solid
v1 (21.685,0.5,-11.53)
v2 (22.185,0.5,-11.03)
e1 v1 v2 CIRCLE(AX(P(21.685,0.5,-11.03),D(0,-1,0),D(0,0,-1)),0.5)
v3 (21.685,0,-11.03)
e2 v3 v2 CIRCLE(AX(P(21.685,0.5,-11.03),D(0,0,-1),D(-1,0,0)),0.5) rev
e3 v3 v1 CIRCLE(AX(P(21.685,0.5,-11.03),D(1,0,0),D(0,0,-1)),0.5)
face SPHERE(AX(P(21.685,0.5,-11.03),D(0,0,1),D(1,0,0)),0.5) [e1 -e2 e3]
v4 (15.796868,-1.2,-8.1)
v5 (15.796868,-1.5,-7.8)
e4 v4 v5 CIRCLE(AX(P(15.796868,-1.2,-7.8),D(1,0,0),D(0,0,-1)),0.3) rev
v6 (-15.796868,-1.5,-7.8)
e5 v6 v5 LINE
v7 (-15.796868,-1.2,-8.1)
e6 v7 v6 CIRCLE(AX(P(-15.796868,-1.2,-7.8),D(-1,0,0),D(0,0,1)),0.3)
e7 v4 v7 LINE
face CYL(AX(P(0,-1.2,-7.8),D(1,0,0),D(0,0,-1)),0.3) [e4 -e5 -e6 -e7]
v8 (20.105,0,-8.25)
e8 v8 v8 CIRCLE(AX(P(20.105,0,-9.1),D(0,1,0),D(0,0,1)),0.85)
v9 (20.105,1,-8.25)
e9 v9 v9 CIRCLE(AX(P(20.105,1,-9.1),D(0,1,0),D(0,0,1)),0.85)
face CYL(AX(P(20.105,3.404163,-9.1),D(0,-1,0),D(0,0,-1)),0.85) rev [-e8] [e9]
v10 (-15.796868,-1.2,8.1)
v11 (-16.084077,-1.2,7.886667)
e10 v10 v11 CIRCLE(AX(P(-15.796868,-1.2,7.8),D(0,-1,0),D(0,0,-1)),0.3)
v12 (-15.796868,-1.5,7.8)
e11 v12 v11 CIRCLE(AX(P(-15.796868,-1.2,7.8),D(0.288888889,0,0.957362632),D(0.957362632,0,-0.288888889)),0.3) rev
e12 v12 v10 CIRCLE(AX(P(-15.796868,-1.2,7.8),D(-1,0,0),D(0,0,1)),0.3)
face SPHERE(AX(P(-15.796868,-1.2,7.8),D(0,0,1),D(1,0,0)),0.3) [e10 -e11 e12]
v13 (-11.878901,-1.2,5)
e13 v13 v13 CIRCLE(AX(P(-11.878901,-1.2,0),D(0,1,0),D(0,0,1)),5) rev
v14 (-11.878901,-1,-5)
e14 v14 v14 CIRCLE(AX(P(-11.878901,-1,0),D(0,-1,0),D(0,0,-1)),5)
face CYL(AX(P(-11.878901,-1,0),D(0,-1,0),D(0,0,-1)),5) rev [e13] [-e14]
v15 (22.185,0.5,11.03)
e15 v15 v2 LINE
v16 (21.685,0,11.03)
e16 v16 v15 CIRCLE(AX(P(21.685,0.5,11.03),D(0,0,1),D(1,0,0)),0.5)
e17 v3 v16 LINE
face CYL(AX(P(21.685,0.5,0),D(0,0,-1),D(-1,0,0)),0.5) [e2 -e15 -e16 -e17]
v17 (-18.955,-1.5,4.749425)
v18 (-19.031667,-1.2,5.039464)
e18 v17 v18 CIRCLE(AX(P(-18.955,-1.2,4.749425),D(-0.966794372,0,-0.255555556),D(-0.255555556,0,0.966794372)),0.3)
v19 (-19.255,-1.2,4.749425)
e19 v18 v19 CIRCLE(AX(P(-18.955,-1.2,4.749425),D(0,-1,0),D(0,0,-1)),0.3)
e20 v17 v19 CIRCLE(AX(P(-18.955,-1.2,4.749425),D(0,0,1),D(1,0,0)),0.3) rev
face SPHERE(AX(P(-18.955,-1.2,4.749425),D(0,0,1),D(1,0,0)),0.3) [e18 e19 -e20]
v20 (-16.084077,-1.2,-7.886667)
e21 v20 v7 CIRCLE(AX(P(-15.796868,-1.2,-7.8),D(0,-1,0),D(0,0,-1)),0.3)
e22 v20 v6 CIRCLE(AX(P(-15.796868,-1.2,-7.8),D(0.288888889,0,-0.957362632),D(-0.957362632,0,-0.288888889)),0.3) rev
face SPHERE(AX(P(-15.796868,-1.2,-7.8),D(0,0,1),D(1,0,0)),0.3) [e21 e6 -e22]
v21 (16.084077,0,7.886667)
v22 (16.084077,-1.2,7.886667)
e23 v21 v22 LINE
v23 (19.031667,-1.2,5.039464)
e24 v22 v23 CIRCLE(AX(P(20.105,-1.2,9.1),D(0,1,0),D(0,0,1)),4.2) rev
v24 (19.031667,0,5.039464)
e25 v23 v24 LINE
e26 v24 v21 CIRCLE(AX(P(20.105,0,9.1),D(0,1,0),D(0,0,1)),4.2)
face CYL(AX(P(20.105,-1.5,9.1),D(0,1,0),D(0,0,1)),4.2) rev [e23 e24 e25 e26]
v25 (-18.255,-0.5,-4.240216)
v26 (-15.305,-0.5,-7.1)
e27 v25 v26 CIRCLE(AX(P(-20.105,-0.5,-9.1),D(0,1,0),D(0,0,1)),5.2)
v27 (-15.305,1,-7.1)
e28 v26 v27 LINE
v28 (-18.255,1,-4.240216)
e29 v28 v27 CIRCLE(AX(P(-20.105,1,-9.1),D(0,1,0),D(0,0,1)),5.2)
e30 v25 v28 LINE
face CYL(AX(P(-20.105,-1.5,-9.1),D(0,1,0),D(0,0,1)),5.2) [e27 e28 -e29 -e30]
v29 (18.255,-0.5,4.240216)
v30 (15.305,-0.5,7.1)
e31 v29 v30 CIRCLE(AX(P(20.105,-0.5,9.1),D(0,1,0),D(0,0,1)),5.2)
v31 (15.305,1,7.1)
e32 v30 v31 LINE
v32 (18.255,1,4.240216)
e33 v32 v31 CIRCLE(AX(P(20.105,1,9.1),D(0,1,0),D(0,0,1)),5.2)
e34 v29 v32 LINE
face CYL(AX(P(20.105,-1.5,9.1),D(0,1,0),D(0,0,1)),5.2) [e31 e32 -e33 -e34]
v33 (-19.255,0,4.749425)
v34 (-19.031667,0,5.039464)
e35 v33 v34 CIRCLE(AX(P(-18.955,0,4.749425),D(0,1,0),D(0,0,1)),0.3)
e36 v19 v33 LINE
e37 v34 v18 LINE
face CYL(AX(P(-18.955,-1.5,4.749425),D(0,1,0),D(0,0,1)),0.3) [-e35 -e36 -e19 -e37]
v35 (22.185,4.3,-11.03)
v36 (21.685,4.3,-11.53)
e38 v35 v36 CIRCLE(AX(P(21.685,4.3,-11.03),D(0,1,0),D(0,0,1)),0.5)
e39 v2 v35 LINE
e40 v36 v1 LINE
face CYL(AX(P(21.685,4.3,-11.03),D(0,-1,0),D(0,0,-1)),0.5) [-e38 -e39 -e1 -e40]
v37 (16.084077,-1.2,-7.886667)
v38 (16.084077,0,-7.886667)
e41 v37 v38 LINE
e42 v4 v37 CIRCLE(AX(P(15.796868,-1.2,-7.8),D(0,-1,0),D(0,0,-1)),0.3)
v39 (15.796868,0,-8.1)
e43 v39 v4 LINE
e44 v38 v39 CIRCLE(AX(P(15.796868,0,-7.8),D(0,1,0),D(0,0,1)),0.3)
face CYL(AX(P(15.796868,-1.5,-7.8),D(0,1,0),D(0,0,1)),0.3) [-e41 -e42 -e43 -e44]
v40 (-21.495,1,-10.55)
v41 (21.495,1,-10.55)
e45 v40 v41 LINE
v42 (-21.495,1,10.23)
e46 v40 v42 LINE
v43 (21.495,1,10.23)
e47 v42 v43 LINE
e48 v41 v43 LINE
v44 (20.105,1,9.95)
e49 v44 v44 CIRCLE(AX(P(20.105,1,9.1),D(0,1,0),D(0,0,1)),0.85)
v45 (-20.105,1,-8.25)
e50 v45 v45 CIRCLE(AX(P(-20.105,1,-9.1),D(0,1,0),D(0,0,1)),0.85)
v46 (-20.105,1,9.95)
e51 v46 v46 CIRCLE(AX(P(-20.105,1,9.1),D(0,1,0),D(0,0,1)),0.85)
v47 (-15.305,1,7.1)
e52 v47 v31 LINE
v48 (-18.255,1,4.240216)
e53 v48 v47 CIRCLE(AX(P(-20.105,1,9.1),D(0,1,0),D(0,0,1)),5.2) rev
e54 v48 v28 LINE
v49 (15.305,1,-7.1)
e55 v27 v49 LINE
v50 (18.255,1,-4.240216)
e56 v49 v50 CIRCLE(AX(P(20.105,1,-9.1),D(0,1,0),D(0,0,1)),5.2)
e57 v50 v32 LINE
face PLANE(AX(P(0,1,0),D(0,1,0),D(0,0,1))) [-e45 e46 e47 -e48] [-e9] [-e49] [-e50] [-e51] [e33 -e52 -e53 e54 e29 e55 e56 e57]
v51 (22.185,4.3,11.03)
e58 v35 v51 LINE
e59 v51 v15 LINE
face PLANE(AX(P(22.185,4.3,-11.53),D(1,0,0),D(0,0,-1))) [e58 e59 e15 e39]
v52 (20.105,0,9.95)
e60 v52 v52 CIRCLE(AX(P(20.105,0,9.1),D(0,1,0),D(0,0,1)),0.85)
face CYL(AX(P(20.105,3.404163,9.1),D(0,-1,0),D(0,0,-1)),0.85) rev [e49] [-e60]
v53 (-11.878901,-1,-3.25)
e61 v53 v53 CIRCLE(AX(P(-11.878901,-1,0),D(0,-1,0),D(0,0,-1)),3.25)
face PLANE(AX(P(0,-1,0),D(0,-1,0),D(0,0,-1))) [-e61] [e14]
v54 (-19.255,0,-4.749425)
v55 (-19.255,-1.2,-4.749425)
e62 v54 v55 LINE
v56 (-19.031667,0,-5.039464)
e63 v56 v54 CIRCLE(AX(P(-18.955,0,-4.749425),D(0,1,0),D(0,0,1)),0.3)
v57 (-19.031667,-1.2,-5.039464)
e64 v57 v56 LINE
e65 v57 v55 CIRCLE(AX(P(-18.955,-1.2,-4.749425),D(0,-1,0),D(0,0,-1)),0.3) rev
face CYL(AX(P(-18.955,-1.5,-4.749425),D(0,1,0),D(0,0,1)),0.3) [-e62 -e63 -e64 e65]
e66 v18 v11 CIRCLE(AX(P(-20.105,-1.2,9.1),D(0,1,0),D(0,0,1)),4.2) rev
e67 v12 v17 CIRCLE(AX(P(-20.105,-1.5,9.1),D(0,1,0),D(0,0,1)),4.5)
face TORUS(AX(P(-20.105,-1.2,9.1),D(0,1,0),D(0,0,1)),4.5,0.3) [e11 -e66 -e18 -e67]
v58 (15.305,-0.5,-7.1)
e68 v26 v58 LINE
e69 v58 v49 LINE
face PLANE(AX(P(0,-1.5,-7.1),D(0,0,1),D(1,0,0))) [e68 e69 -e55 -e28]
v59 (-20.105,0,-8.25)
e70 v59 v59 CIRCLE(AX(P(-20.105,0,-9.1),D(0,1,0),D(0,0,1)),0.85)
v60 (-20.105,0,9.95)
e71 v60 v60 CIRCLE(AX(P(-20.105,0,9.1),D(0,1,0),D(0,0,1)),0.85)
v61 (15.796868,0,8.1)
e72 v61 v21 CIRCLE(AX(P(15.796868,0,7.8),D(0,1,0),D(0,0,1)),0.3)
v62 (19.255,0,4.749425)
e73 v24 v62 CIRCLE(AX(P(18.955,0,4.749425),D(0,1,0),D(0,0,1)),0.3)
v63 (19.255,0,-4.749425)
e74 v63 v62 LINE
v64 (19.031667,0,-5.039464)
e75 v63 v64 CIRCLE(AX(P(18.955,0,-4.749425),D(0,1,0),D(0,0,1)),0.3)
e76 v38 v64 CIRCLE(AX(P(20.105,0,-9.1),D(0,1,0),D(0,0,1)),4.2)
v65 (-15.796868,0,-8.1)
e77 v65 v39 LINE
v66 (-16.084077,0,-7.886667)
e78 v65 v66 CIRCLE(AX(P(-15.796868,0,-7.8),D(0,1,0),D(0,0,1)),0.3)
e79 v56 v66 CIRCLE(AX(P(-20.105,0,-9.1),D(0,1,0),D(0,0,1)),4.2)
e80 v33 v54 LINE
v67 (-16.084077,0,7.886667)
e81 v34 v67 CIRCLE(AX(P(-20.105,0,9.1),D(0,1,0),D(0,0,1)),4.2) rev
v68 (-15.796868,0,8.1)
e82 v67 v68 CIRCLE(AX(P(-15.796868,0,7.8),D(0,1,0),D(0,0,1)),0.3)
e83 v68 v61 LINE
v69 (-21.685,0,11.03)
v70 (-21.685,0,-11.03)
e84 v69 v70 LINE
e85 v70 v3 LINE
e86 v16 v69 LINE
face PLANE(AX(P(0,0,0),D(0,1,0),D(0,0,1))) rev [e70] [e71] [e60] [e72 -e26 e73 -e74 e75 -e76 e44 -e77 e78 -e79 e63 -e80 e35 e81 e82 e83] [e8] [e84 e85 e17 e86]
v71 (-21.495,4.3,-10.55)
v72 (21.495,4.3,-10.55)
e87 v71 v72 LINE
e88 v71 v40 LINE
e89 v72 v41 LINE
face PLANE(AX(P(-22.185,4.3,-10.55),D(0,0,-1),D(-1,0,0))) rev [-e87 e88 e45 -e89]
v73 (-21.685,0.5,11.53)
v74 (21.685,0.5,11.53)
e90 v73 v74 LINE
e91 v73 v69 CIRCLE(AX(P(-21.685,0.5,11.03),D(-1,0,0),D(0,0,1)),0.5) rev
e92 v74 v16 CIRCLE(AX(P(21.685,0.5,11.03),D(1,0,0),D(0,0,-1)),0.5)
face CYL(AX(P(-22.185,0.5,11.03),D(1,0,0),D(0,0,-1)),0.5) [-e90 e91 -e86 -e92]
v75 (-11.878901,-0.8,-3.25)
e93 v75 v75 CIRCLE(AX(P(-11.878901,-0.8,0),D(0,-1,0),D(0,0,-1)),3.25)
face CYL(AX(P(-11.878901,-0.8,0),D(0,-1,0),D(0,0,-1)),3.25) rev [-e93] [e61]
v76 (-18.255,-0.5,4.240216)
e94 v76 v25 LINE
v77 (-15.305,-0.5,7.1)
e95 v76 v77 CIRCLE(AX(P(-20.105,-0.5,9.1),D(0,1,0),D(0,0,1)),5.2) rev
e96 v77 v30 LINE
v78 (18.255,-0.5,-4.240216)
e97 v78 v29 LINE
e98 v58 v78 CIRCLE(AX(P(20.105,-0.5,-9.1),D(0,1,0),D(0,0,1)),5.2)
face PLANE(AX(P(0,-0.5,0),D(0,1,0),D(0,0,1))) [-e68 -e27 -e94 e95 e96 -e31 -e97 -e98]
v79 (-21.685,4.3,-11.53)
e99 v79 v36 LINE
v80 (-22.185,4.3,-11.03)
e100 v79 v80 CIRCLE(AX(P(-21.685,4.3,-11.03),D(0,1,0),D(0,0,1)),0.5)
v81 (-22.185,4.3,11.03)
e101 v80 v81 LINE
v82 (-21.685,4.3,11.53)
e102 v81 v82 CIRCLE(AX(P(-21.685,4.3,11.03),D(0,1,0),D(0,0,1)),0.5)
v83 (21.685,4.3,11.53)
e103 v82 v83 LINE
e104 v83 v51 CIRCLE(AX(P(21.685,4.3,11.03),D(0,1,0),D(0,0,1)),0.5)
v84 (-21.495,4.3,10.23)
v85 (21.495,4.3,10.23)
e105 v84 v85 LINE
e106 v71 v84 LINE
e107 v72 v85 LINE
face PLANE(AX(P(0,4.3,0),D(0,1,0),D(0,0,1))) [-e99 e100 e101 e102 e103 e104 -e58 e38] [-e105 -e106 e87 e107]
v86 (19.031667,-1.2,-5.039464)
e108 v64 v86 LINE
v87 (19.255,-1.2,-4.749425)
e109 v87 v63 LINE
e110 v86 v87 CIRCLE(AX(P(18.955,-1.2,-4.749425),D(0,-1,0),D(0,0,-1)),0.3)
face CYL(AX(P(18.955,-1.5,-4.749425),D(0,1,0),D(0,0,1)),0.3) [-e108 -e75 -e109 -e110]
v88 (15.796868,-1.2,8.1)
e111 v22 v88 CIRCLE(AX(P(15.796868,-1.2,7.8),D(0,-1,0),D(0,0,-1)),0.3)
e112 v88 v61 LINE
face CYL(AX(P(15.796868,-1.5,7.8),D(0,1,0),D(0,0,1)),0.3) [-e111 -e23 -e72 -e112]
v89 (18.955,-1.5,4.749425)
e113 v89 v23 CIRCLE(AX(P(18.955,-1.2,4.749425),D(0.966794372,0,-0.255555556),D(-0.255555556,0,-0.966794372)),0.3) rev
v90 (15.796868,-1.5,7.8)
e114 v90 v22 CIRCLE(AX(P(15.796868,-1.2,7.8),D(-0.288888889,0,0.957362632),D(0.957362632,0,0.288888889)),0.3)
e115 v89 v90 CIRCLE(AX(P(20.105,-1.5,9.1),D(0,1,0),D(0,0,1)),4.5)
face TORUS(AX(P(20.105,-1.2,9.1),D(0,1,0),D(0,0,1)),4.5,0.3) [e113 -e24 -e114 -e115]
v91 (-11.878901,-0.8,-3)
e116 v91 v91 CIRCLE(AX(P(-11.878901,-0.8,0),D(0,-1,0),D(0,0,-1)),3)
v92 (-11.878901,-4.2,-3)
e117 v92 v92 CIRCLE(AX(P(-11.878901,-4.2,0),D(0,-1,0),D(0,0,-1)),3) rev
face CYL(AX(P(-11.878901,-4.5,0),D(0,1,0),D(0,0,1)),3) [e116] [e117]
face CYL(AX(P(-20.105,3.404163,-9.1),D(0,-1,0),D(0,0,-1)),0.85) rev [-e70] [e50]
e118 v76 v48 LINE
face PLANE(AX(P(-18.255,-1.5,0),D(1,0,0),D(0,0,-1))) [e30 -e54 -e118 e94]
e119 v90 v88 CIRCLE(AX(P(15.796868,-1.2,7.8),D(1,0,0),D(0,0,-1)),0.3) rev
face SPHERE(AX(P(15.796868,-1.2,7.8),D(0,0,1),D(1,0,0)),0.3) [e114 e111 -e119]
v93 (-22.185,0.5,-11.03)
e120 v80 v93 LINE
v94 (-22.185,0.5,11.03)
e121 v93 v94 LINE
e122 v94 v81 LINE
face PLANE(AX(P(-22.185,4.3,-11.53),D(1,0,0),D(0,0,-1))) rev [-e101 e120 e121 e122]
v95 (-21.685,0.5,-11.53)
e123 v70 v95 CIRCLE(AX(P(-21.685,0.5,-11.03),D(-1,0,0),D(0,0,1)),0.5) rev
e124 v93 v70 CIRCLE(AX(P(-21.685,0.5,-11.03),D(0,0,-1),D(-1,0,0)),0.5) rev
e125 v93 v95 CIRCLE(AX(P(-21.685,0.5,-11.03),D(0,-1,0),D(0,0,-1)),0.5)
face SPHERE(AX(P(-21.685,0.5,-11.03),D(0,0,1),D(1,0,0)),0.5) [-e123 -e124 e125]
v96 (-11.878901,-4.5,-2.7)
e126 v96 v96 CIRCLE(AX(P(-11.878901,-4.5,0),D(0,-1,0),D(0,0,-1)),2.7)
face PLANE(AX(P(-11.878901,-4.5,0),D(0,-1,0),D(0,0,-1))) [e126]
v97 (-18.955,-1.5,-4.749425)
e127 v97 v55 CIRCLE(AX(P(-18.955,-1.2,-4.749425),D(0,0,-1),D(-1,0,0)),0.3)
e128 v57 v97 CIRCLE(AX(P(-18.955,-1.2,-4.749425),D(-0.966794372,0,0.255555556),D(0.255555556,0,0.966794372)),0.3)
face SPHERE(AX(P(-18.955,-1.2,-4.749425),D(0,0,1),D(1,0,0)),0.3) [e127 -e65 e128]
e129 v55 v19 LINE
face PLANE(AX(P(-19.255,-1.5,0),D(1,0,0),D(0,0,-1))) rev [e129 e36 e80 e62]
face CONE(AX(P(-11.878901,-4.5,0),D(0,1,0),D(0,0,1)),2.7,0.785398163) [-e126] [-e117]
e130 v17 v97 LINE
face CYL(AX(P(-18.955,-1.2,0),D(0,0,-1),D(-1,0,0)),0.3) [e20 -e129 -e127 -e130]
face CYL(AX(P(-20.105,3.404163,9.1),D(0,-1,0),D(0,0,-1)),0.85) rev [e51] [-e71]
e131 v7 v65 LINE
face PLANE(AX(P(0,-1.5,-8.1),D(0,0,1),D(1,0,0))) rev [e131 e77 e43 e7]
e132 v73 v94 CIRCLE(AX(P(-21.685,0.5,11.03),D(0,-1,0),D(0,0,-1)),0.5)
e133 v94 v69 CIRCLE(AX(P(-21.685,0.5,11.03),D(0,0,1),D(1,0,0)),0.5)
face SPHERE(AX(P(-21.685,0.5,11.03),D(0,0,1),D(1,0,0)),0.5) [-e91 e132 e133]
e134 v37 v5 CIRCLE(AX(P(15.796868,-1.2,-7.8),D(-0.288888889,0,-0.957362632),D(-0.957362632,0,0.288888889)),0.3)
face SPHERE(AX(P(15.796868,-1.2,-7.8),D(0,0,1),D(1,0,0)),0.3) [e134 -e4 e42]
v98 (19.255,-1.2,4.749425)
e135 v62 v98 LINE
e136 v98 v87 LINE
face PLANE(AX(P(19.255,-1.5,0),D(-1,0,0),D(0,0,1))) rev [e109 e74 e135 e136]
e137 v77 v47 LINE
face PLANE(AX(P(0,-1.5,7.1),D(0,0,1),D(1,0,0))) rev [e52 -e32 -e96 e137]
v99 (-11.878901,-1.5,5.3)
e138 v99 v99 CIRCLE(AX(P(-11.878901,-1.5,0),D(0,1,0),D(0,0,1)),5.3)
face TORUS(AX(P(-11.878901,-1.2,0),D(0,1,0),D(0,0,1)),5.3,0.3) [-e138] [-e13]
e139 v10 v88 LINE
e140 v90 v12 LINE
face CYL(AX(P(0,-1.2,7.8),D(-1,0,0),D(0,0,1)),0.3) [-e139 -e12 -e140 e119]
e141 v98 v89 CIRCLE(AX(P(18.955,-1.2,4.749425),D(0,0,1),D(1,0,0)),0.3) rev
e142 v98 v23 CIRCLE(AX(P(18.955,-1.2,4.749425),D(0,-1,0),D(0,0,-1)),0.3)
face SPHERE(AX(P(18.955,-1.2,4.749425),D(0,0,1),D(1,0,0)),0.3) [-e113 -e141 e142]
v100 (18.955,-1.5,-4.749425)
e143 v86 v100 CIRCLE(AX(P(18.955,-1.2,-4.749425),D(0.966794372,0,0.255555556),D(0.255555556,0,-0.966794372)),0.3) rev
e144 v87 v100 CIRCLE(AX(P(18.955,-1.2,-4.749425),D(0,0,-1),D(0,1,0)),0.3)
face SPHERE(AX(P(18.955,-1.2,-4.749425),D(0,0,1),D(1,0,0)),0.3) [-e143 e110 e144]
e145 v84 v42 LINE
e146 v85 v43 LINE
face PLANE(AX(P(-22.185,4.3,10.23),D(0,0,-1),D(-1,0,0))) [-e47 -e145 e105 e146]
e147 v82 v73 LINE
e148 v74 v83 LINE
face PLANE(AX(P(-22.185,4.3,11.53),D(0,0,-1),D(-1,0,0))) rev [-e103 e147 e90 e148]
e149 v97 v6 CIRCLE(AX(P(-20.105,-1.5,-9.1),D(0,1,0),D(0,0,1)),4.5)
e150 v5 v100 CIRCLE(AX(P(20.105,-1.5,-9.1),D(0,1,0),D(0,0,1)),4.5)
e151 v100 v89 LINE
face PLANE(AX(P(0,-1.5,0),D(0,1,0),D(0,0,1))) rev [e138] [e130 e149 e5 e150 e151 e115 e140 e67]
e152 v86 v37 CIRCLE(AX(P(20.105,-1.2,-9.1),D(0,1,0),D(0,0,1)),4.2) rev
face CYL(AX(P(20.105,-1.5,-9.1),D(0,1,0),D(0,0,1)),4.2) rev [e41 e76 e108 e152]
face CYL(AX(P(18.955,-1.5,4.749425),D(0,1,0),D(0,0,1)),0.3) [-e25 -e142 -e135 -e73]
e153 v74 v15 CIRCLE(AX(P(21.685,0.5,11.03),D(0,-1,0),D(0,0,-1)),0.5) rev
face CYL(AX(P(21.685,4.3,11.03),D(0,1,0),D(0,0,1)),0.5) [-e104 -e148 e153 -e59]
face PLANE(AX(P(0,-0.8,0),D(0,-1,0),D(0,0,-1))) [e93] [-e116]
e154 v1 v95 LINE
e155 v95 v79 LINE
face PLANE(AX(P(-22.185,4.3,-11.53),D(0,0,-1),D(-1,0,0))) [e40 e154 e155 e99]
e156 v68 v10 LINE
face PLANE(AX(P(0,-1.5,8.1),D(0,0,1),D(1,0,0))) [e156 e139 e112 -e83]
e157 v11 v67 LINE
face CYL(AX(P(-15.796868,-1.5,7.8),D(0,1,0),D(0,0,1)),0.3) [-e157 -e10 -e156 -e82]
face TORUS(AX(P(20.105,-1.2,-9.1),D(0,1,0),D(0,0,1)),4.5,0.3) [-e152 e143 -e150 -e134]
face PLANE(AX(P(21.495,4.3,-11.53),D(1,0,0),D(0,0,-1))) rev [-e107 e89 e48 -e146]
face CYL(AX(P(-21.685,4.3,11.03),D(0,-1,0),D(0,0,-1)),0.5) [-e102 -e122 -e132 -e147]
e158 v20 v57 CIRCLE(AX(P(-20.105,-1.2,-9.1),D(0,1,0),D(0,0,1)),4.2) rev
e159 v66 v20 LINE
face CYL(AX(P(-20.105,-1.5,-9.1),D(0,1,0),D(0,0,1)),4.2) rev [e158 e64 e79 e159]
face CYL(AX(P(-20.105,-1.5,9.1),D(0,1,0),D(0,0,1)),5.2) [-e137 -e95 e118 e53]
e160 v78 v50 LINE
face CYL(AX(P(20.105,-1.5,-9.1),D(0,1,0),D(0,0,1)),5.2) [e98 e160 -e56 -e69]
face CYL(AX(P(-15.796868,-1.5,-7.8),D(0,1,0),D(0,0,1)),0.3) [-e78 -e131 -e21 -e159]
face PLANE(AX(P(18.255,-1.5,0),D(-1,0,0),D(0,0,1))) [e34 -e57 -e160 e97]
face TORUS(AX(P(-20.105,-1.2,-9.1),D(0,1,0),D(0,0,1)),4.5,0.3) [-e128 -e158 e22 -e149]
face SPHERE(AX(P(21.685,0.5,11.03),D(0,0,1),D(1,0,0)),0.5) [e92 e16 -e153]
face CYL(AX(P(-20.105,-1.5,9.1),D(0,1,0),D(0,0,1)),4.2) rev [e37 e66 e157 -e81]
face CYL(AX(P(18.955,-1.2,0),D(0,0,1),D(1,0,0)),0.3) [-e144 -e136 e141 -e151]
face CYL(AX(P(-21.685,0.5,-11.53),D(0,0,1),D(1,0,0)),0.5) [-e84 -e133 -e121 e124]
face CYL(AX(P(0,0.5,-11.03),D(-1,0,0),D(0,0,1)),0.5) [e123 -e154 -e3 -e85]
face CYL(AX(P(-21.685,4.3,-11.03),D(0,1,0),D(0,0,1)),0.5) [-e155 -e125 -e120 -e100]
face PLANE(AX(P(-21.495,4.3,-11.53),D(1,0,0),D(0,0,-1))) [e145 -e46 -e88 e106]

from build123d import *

# Parameters (mm, degrees)
TOP_COVER_SKETCH_01_W       = 44.37
TOP_COVER_SKETCH_01_H       = 23.06
TOP_COVER_EXT_SHAPE_DEPTH   = 4.3
SALIENTE_EXTRUIR1_DEPTH     = 1.5
VACIADO1_T                  = -1
VACIADO1_THICKNESS_2_FACE_W = 21.06
VACIADO1_THICKNESS_2_FACE_H = 3.3
VACIADO1_THICKNESS_2_DEPTH  = 0.31
VACIADO1_THICKNESS_3_FACE_W = 21.06
VACIADO1_THICKNESS_3_FACE_H = 3.3
VACIADO1_THICKNESS_3_DEPTH  = 0.31
VACIADO1_THICKNESS_4_FACE_W = 42.99
VACIADO1_THICKNESS_4_FACE_H = 3.3
VACIADO1_THICKNESS_4_DEPTH  = 0.02
VACIADO1_THICKNESS_5_FACE_W = 42.99
VACIADO1_THICKNESS_5_FACE_H = 3.3
VACIADO1_THICKNESS_5_DEPTH  = 0.3
CROQUIS1_R                  = 3.25
CORTAR_EXTRUIR1_DEPTH       = 0.7
CROQUIS1_5_R                = 5
CROQUIS1_5_R_2              = 3.25
CORTAR_EXTRUIR2_DEPTH       = 0.5
CROQUIS2_R                  = 3
SALIENTE_EXTRUIR2_DEPTH     = 3.7
REDONDEO1_R                 = 0.5
REDONDEO2_R                 = 0.3
TOP_COVER_SKETCH_01_19_R    = 0.85
CORTAR_EXTRUIR3_DEPTH       = 1


with BuildPart() as part:
    # Top-cover-sketch-01 → Top-cover-ext-shape (new body)
    with BuildSketch(Plane(origin=(0, 0, 0), x_dir=(1, 0, 0), z_dir=(0, 1, 0))):
        Rectangle(TOP_COVER_SKETCH_01_W, TOP_COVER_SKETCH_01_H)
    extrude(amount=TOP_COVER_EXT_SHAPE_DEPTH)

    # Top-cover-sketch-01<18> → Saliente-Extruir1 (add)
    with BuildSketch(Plane(origin=(0, 0, 0), x_dir=(1, 0, 0), z_dir=(0, 1, 0))):
        with BuildLine():
            Line((-19.255, -4.986911136), (-19.255, 4.986911136))
            ThreePointArc((-19.255, 4.986911136), (-17.190017633, 6.076280801), (-16.025784389, 8.1))
            Line((-16.025784389, 8.1), (16.025784389, 8.1))
            ThreePointArc((16.025784389, 8.1), (17.190017633, 6.076280801), (19.255, 4.986911136))
            Line((19.255, 4.986911136), (19.255, -4.986911136))
            ThreePointArc((19.255, -4.986911136), (17.190017633, -6.076280801), (16.025784389, -8.1))
            Line((16.025784389, -8.1), (-16.025784389, -8.1))
            ThreePointArc((-16.025784389, -8.1), (-17.190017633, -6.076280801), (-19.255, -4.986911136))
        make_face()
    extrude(amount=-SALIENTE_EXTRUIR1_DEPTH)

    # Vaciado1
    vaciado1_openings = [part.faces().sort_by_distance(p)[0] for p in [
        (0, 4.3, 0),
    ]]
    offset(amount=VACIADO1_T, openings=vaciado1_openings, kind=Kind.INTERSECTION)

    # Vaciado1 thickness 2 face (on inner face of the shell) → Vaciado1 thickness 2 (cut)
    with BuildSketch(Plane(origin=(-21.185, 2.65, 0), x_dir=(0, 0, -1), z_dir=(-1, 0, 0))):
        Rectangle(VACIADO1_THICKNESS_2_FACE_W, VACIADO1_THICKNESS_2_FACE_H)
    extrude(amount=VACIADO1_THICKNESS_2_DEPTH, mode=Mode.SUBTRACT)

    # Vaciado1 thickness 3 face (on inner face of the shell) → Vaciado1 thickness 3 (cut)
    with BuildSketch(Plane(origin=(21.185, 2.65, 0), x_dir=(0, 0, 1), z_dir=(1, 0, 0))):
        Rectangle(VACIADO1_THICKNESS_3_FACE_W, VACIADO1_THICKNESS_3_FACE_H)
    extrude(amount=VACIADO1_THICKNESS_3_DEPTH, mode=Mode.SUBTRACT)

    # Vaciado1 thickness 4 face (on inner face of the shell) → Vaciado1 thickness 4 (cut)
    with BuildSketch(Plane(origin=(0, 2.65, -10.53), x_dir=(-1, 0, 0), z_dir=(0, 0, -1))):
        Rectangle(VACIADO1_THICKNESS_4_FACE_W, VACIADO1_THICKNESS_4_FACE_H)
    extrude(amount=VACIADO1_THICKNESS_4_DEPTH, mode=Mode.SUBTRACT)

    # Vaciado1 thickness 5 face (on inner face of the shell) → Vaciado1 thickness 5 (add)
    with BuildSketch(Plane(origin=(0, 2.65, 10.53), x_dir=(1, 0, 0), z_dir=(0, 0, 1))):
        Rectangle(VACIADO1_THICKNESS_5_FACE_W, VACIADO1_THICKNESS_5_FACE_H)
    extrude(amount=-VACIADO1_THICKNESS_5_DEPTH)

    # Croquis1 → Cortar-Extruir1 (cut)
    with BuildSketch(Plane.XZ.offset(1.5)):
        with Locations(Location((-11.878900962, 0, 0), (0, 0, 270))):
            Circle(CROQUIS1_R)
    extrude(amount=-CORTAR_EXTRUIR1_DEPTH, mode=Mode.SUBTRACT)

    # Croquis1<5> → Cortar-Extruir2 (cut)
    with BuildSketch(Plane.XZ.offset(1.5)):
        with Locations(Location((-11.878900962, 0, 0), (0, 0, 270))):
            Circle(CROQUIS1_5_R)
        with Locations(Location((-11.878900962, 0, 0), (0, 0, 270))):
            Circle(CROQUIS1_5_R_2, mode=Mode.SUBTRACT)
    extrude(amount=-CORTAR_EXTRUIR2_DEPTH, mode=Mode.SUBTRACT)

    # Croquis2 → Saliente-Extruir2 (add)
    with BuildSketch(Plane.XZ.offset(0.8)):
        with Locations(Location((-11.878900962, 0, 0), (0, 0, 270))):
            Circle(CROQUIS2_R)
    extrude(amount=SALIENTE_EXTRUIR2_DEPTH)

    # Redondeo1
    redondeo1_edges = [part.edges().sort_by_distance(p)[0] for p in [
        (0, 0, -11.53),
        (22.185, 0, 0),
        (0, 0, 11.53),
        (-22.185, 0, 0),
        (-22.185, 2.15, -11.53),
        (22.185, 2.15, -11.53),
        (22.185, 2.15, 11.53),
        (-22.185, 2.15, 11.53),
    ]]
    fillet(redondeo1_edges, radius=REDONDEO1_R)

    # Redondeo2
    redondeo2_edges = [part.edges().sort_by_distance(p)[0] for p in [
        (-19.255, -0.75, 4.986911136),
        (-19.255, -0.75, -4.986911136),
        (-16.025784389, -0.75, -8.1),
        (16.025784389, -0.75, -8.1),
        (19.255, -0.75, -4.986911136),
        (19.255, -0.75, 4.986911136),
        (0, -1.5, 8.1),
        (16.025784389, -0.75, 8.1),
        (-17.190017633, -1.5, 6.076280801),
        (-16.025784389, -0.75, 8.1),
        (-19.255, -1.5, 0),
        (-17.190017633, -1.5, -6.076280801),
        (0, -1.5, -8.1),
        (17.190017633, -1.5, -6.076280801),
        (19.255, -1.5, 0),
        (17.190017633, -1.5, 6.076280801),
        (-11.878900962, -1.5, 5),
    ]]
    fillet(redondeo2_edges, radius=REDONDEO2_R)

    # Chaflán1: read off the stored shape, not the designer's step
    # Chaflán1 outline → Chaflán1 (revolve, cut)
    with BuildSketch(Plane(origin=(-11.878900962, 0, 0), x_dir=(1, 0, 0), z_dir=(0, 0, 1))):
        Polygon((3, -4.2), (2.7, -4.5), (3, -4.5), align=None)
    revolve(axis=Axis((-11.878900962, 0, 0), (0, 1, 0)), mode=Mode.SUBTRACT)

    # Top-cover-sketch-01<19> → Cortar-Extruir3 (cut)
    with BuildSketch(Plane(origin=(0, 0, 0), x_dir=(1, 0, 0), z_dir=(0, 1, 0))):
        with Locations(Location((-20.105, 9.1, 0), (0, 0, 270))):
            Circle(TOP_COVER_SKETCH_01_19_R)
        with Locations(Location((20.105, 9.1, 0), (0, 0, 270))):
            Circle(TOP_COVER_SKETCH_01_19_R)
        with Locations(Location((20.105, -9.1, 0), (0, 0, 270))):
            Circle(TOP_COVER_SKETCH_01_19_R)
        with Locations(Location((-20.105, -9.1, 0), (0, 0, 270))):
            Circle(TOP_COVER_SKETCH_01_19_R)
    extrude(amount=CORTAR_EXTRUIR3_DEPTH, mode=Mode.SUBTRACT)


solid = part.part
